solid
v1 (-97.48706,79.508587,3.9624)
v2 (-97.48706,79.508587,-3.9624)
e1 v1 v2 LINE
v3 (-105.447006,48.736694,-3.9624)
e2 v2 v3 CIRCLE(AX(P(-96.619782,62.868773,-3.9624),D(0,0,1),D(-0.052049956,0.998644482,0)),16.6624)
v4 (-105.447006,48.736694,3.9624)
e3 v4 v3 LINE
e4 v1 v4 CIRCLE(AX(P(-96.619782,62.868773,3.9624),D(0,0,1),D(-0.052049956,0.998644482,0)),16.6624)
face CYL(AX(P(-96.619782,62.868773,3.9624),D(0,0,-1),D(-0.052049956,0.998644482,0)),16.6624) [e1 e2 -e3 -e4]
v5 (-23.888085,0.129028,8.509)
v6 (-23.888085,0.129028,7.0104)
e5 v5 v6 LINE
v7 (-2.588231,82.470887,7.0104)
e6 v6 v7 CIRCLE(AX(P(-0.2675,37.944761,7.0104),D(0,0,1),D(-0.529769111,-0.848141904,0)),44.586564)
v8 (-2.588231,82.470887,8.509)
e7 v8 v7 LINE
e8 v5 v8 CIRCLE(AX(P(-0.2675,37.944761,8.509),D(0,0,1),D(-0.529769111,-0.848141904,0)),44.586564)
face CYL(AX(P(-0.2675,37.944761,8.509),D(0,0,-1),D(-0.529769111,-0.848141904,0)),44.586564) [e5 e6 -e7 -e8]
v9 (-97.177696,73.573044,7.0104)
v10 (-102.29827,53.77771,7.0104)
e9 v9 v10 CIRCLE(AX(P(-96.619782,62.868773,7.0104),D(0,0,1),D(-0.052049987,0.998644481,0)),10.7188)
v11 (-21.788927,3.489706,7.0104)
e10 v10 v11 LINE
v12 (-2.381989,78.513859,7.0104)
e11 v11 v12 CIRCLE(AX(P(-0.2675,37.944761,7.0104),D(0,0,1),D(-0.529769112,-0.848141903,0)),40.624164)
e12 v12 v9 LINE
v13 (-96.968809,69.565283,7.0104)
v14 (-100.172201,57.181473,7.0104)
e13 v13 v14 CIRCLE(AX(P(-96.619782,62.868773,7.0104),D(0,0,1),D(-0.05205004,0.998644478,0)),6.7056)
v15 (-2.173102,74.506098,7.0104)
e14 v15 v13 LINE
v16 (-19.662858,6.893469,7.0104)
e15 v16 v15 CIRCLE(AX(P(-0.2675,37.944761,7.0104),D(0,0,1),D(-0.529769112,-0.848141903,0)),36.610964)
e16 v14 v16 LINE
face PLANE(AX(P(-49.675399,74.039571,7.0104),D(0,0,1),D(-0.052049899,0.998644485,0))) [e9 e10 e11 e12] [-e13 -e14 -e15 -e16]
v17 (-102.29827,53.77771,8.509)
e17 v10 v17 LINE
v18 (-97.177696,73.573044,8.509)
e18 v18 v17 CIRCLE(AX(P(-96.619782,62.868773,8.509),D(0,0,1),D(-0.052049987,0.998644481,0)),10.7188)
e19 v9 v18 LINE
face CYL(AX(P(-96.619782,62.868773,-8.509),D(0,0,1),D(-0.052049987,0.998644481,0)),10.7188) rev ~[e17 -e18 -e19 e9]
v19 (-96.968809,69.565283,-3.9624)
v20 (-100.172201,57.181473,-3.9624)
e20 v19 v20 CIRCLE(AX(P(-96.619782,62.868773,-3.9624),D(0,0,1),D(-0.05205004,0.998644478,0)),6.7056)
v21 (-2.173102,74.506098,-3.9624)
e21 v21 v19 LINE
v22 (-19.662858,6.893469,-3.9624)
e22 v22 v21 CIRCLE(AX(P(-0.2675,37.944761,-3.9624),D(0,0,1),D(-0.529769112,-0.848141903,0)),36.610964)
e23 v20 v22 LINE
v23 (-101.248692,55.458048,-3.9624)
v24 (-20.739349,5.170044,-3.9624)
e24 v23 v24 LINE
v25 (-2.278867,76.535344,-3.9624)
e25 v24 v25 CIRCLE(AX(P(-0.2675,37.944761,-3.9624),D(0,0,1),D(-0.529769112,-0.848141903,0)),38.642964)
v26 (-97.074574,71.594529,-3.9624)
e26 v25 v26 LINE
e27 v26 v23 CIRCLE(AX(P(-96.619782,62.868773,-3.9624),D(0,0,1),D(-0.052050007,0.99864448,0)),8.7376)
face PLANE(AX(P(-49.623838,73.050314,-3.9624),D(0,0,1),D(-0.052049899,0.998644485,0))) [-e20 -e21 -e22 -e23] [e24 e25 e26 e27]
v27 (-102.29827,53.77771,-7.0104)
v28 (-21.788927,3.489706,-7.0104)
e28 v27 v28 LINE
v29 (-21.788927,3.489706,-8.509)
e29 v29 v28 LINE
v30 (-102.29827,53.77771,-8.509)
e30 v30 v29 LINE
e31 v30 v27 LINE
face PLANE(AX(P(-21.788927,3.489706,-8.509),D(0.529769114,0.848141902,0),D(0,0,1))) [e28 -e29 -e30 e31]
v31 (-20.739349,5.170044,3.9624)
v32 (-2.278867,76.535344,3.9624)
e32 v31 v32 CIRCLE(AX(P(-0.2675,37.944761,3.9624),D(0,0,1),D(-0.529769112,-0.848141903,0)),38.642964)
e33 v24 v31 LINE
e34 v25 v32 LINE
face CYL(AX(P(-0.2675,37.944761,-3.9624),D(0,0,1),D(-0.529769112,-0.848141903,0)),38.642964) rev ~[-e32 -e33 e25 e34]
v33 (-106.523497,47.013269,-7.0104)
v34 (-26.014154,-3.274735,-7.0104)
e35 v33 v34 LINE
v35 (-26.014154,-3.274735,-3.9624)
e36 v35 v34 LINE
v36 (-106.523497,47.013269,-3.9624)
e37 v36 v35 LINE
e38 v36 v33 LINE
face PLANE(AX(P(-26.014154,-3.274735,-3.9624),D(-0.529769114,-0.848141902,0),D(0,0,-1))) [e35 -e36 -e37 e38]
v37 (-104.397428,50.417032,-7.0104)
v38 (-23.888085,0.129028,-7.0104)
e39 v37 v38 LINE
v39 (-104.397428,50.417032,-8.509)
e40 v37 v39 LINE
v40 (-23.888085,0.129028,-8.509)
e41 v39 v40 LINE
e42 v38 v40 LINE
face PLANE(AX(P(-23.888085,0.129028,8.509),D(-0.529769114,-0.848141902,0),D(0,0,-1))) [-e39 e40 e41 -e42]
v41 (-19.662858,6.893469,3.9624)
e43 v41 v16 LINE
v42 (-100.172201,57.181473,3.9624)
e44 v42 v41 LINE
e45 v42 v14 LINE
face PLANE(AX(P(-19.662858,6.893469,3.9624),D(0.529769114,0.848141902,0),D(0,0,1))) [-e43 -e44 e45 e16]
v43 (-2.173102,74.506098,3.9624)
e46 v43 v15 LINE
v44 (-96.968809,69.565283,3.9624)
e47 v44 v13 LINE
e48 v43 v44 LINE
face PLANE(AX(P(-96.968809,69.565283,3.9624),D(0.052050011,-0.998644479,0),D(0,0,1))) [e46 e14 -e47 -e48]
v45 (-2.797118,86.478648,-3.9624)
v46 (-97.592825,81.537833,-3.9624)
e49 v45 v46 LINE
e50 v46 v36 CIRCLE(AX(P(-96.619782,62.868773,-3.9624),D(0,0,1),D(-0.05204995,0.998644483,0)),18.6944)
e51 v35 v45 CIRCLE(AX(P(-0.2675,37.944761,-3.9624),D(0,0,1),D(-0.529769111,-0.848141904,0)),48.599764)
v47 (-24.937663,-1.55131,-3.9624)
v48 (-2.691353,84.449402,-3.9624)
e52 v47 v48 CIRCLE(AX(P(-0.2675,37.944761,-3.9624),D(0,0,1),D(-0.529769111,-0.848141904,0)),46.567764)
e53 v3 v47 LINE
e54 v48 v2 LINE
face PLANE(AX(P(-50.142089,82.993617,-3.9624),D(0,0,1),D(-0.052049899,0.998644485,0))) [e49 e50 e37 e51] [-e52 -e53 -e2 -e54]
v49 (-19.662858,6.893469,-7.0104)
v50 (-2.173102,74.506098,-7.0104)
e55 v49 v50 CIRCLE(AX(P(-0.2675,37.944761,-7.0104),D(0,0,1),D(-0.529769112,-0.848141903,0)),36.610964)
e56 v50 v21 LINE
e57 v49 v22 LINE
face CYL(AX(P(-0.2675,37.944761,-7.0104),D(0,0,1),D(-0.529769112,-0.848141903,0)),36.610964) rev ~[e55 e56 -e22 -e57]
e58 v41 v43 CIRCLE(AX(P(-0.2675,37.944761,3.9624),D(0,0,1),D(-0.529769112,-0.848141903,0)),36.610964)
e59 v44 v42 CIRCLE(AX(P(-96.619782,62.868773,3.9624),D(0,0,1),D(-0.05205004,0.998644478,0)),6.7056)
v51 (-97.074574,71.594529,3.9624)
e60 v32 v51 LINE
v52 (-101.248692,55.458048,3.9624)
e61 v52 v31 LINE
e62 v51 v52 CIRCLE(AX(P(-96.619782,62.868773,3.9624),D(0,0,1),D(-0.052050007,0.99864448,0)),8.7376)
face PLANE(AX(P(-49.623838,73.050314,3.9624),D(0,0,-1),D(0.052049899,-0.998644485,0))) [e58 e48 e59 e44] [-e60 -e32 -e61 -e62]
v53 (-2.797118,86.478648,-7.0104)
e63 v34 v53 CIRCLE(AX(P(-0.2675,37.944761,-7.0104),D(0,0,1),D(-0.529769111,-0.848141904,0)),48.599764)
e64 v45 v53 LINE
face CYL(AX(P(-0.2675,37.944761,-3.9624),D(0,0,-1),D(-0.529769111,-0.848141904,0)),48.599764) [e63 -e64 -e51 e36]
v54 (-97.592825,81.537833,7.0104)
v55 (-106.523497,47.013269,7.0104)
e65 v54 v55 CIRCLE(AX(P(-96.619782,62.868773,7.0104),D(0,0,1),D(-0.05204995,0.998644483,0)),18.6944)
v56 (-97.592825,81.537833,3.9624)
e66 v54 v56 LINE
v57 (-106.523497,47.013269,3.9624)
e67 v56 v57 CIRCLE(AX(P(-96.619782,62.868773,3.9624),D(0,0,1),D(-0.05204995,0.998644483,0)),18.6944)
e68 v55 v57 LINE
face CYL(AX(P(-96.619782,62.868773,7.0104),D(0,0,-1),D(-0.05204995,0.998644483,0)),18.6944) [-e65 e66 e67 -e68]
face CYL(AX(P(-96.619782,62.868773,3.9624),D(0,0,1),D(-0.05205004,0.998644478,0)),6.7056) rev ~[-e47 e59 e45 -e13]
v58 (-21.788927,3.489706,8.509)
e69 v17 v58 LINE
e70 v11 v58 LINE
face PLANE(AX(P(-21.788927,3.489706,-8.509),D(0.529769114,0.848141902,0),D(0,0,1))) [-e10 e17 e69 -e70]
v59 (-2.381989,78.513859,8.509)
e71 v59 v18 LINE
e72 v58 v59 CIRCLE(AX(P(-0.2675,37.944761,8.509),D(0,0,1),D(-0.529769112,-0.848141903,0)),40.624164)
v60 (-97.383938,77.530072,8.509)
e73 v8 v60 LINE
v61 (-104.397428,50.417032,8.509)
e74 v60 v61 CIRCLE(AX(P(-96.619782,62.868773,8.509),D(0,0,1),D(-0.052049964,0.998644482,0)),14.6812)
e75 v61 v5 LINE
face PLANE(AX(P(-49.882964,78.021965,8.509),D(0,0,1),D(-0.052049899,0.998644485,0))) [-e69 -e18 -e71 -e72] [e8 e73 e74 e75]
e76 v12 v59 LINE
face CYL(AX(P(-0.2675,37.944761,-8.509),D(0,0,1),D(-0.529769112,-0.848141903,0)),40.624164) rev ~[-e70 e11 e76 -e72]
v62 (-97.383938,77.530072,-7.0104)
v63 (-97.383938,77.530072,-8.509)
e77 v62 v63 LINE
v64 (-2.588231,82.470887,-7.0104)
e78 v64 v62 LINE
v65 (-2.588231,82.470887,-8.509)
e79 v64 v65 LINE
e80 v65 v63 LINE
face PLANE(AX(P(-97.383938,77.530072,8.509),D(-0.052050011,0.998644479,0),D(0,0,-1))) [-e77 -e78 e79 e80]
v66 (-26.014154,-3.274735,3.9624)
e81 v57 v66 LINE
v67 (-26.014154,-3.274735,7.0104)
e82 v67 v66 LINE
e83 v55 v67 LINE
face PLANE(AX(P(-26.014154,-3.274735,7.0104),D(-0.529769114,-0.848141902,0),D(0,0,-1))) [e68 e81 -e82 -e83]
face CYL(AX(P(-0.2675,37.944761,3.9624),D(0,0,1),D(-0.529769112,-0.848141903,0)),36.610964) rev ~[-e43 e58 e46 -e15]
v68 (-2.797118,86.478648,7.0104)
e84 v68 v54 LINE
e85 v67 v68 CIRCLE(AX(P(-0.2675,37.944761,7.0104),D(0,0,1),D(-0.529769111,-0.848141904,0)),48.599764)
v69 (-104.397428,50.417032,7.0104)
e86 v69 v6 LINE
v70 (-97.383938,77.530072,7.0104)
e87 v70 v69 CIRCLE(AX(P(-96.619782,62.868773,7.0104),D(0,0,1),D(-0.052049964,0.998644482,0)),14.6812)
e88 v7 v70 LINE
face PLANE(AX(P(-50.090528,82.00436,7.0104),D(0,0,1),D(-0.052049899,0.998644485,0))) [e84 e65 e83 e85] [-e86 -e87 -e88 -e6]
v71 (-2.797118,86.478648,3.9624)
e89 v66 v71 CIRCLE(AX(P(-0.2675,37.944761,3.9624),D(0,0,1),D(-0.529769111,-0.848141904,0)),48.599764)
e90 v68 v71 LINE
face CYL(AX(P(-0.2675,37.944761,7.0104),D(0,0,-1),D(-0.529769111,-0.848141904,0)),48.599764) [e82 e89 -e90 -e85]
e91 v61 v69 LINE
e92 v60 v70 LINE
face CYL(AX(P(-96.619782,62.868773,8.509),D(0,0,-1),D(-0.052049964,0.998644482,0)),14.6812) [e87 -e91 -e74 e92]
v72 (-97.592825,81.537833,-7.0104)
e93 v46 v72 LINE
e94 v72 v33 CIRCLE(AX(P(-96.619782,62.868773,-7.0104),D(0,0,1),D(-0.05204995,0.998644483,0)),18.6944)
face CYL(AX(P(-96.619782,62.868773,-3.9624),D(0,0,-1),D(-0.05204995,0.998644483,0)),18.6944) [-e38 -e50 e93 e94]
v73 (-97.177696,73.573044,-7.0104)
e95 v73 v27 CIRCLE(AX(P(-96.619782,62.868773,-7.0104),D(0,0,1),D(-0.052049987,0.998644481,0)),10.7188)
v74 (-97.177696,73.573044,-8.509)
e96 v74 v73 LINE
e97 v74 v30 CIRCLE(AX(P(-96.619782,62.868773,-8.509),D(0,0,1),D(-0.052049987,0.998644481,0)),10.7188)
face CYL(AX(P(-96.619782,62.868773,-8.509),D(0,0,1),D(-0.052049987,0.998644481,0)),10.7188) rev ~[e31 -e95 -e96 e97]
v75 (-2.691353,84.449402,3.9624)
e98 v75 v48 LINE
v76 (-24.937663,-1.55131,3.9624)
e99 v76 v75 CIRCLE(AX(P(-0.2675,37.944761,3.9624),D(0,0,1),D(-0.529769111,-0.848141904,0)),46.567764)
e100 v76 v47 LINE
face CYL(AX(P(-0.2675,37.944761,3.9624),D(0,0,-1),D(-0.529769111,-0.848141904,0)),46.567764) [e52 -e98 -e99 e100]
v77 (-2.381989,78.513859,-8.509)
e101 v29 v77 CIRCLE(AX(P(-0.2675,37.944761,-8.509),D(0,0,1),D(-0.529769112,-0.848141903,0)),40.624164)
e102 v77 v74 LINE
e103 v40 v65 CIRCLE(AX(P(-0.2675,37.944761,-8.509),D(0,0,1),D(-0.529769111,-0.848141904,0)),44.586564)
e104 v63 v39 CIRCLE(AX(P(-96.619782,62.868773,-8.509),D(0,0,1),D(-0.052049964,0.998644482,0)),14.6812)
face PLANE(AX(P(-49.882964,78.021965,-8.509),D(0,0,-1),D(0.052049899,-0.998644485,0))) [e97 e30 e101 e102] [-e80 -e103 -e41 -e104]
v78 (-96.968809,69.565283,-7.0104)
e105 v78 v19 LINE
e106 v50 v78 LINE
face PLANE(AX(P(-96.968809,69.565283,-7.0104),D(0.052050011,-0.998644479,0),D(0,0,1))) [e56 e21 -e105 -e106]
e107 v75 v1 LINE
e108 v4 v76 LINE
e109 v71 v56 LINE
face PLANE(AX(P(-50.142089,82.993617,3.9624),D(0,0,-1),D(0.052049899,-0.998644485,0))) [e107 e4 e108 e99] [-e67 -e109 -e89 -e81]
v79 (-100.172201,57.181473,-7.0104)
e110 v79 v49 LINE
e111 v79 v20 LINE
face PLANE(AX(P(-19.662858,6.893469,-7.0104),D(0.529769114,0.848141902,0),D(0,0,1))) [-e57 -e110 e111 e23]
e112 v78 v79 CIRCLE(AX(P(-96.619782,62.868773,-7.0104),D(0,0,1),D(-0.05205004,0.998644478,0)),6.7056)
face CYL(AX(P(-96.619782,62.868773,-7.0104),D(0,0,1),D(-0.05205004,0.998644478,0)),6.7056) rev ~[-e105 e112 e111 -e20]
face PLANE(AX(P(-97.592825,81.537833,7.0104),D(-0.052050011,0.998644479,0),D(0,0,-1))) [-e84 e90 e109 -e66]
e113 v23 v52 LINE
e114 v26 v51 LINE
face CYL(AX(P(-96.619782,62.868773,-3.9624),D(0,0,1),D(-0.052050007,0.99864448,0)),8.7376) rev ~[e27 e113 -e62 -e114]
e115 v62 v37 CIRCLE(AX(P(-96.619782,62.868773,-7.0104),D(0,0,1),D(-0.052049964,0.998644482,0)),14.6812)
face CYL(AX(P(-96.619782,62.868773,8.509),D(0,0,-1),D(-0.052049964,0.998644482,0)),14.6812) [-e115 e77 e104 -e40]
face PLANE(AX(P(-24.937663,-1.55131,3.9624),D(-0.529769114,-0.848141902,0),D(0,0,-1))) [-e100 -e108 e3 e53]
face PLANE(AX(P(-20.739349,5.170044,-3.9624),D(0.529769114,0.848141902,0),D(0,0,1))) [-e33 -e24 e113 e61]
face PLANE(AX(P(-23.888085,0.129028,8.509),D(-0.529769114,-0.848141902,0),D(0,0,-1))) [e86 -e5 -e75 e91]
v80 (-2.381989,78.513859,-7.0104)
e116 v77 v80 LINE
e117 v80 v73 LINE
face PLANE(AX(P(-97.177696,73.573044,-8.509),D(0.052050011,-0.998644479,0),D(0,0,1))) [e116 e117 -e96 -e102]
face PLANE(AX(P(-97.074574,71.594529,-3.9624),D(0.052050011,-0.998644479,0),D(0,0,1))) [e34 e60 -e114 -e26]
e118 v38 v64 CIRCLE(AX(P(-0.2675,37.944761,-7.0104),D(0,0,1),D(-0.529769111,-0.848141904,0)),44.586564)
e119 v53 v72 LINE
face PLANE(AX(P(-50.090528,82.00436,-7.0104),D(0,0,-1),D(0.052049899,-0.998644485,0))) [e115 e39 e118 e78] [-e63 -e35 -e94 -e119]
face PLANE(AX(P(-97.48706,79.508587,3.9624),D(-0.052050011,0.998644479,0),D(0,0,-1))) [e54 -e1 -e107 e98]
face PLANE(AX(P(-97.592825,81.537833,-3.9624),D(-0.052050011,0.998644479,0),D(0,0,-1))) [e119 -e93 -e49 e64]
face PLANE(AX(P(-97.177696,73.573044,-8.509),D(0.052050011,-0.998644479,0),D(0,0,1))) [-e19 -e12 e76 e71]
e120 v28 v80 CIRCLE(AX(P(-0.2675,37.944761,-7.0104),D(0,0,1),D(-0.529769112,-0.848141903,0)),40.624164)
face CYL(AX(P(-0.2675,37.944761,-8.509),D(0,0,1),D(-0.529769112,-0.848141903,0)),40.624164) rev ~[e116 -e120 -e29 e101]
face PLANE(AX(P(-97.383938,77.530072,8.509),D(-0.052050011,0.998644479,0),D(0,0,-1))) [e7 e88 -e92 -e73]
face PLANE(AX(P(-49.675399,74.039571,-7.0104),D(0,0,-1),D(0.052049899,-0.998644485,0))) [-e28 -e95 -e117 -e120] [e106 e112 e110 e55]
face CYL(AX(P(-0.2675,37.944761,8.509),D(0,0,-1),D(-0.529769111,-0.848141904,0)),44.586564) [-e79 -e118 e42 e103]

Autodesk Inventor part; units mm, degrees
ref_plane "Work Plane2" through (-96.619782, 62.868773, 0) normal (-1, 0, 0) x (0, 0, 1)
ref_plane "Work Plane3" through (-0.2675, 37.944761, 0) normal (-0.9927601, 0.120114, 0) x (0, 0, 1)
sketch "Path" plane through (0, 0, 0) normal (0, 0, 1) x (1, 0, 0)
  arc A0 (-97.280817, 75.551558) -> (-103.347849, 52.097371) centre (-96.619782, 62.868773) ccw
  arc A1 (-22.838506, 1.809367) -> (-2.48511, 80.492373) centre (-0.2675, 37.944761) ccw
  line L0 (-22.838506, 1.809367) -> (-103.347849, 52.097371)
  line L1 (-97.280817, 75.551558) -> (-2.48511, 80.492373)
  dimension "d31" = 11.9888
ref_plane "Section Plane" through (-103.347849, 52.097371, 0) normal (0.8481419, -0.5297691, 0) x (0, 0, 1)
sketch "Section Sketch" plane through (-103.347849, 52.097371, 0) normal (0.8481419, -0.5297691, 0) x (0, 0, 1)
  line L0 (-8.509, -1.9812) -> (8.509, -1.9812)
  line L1 (8.509, -1.9812) -> (8.509, 1.9812)
  line L2 (8.509, 1.9812) -> (-8.509, 1.9812)
  line L3 (-8.509, 1.9812) -> (-8.509, -1.9812)
  line L4 (-3.9624, -3.9624) -> (3.9624, -3.9624)
  line L5 (3.9624, -3.9624) -> (3.9624, 3.9624)
  line L6 (3.9624, 3.9624) -> (-3.9624, 3.9624)
  line L7 (-3.9624, 3.9624) -> (-3.9624, -3.9624)
  line L8 (-3.9624, 0) -> (3.9624, 0) construction
  line L9 (-7.0104, -5.9944) -> (-3.9624, -5.9944)
  line L10 (-3.9624, -5.9944) -> (-3.9624, 5.9944)
  line L11 (-3.9624, 5.9944) -> (-7.0104, 5.9944)
  line L12 (-7.0104, 5.9944) -> (-7.0104, -5.9944)
  line L13 (3.9624, -5.9944) -> (7.0104, -5.9944)
  line L14 (7.0104, -5.9944) -> (7.0104, 5.9944)
  line L15 (7.0104, 5.9944) -> (3.9624, 5.9944)
  line L16 (3.9624, 5.9944) -> (3.9624, -5.9944)
  line L17 (-8.509, 0) -> (8.509, 0) construction
  point P0 (0, 0)
  point P1 (0, 0)
  dimension "d21" = 3.9624
  dimension "d22" = 7.9248
  dimension "d23" = 7.9248
  dimension "d24" = 3.048
  dimension "d31" = 11.9888
  dimension "d32" = 17.018
sweep "Solid" add profiles "Section Sketch" path "Path"
pattern_of_one "Strand Pattern"
equation "\"d21\" = da_d2"
equation "\"d22\" = da_d1"
equation "\"d23\" = da_b1"
equation "\"d24\" = da_t1 + da_t2"
equation "\"d30\" = da_pt"
equation "\"da_p\" = 12.7"
equation "\"da_b1\" = 7.9248"
equation "\"da_h2\" = 11.9888"
equation "\"da_h3\" = 10.3886"
equation "\"da_d1\" = 7.9248"
equation "\"da_d2\" = 3.9624"
equation "\"da_pt\" = 14.3764"
equation "\"da_b\" = 17.018"
equation "\"da_t1\" = 1.524"
equation "\"da_t2\" = 1.524"
properties part number "Roller Chain"
